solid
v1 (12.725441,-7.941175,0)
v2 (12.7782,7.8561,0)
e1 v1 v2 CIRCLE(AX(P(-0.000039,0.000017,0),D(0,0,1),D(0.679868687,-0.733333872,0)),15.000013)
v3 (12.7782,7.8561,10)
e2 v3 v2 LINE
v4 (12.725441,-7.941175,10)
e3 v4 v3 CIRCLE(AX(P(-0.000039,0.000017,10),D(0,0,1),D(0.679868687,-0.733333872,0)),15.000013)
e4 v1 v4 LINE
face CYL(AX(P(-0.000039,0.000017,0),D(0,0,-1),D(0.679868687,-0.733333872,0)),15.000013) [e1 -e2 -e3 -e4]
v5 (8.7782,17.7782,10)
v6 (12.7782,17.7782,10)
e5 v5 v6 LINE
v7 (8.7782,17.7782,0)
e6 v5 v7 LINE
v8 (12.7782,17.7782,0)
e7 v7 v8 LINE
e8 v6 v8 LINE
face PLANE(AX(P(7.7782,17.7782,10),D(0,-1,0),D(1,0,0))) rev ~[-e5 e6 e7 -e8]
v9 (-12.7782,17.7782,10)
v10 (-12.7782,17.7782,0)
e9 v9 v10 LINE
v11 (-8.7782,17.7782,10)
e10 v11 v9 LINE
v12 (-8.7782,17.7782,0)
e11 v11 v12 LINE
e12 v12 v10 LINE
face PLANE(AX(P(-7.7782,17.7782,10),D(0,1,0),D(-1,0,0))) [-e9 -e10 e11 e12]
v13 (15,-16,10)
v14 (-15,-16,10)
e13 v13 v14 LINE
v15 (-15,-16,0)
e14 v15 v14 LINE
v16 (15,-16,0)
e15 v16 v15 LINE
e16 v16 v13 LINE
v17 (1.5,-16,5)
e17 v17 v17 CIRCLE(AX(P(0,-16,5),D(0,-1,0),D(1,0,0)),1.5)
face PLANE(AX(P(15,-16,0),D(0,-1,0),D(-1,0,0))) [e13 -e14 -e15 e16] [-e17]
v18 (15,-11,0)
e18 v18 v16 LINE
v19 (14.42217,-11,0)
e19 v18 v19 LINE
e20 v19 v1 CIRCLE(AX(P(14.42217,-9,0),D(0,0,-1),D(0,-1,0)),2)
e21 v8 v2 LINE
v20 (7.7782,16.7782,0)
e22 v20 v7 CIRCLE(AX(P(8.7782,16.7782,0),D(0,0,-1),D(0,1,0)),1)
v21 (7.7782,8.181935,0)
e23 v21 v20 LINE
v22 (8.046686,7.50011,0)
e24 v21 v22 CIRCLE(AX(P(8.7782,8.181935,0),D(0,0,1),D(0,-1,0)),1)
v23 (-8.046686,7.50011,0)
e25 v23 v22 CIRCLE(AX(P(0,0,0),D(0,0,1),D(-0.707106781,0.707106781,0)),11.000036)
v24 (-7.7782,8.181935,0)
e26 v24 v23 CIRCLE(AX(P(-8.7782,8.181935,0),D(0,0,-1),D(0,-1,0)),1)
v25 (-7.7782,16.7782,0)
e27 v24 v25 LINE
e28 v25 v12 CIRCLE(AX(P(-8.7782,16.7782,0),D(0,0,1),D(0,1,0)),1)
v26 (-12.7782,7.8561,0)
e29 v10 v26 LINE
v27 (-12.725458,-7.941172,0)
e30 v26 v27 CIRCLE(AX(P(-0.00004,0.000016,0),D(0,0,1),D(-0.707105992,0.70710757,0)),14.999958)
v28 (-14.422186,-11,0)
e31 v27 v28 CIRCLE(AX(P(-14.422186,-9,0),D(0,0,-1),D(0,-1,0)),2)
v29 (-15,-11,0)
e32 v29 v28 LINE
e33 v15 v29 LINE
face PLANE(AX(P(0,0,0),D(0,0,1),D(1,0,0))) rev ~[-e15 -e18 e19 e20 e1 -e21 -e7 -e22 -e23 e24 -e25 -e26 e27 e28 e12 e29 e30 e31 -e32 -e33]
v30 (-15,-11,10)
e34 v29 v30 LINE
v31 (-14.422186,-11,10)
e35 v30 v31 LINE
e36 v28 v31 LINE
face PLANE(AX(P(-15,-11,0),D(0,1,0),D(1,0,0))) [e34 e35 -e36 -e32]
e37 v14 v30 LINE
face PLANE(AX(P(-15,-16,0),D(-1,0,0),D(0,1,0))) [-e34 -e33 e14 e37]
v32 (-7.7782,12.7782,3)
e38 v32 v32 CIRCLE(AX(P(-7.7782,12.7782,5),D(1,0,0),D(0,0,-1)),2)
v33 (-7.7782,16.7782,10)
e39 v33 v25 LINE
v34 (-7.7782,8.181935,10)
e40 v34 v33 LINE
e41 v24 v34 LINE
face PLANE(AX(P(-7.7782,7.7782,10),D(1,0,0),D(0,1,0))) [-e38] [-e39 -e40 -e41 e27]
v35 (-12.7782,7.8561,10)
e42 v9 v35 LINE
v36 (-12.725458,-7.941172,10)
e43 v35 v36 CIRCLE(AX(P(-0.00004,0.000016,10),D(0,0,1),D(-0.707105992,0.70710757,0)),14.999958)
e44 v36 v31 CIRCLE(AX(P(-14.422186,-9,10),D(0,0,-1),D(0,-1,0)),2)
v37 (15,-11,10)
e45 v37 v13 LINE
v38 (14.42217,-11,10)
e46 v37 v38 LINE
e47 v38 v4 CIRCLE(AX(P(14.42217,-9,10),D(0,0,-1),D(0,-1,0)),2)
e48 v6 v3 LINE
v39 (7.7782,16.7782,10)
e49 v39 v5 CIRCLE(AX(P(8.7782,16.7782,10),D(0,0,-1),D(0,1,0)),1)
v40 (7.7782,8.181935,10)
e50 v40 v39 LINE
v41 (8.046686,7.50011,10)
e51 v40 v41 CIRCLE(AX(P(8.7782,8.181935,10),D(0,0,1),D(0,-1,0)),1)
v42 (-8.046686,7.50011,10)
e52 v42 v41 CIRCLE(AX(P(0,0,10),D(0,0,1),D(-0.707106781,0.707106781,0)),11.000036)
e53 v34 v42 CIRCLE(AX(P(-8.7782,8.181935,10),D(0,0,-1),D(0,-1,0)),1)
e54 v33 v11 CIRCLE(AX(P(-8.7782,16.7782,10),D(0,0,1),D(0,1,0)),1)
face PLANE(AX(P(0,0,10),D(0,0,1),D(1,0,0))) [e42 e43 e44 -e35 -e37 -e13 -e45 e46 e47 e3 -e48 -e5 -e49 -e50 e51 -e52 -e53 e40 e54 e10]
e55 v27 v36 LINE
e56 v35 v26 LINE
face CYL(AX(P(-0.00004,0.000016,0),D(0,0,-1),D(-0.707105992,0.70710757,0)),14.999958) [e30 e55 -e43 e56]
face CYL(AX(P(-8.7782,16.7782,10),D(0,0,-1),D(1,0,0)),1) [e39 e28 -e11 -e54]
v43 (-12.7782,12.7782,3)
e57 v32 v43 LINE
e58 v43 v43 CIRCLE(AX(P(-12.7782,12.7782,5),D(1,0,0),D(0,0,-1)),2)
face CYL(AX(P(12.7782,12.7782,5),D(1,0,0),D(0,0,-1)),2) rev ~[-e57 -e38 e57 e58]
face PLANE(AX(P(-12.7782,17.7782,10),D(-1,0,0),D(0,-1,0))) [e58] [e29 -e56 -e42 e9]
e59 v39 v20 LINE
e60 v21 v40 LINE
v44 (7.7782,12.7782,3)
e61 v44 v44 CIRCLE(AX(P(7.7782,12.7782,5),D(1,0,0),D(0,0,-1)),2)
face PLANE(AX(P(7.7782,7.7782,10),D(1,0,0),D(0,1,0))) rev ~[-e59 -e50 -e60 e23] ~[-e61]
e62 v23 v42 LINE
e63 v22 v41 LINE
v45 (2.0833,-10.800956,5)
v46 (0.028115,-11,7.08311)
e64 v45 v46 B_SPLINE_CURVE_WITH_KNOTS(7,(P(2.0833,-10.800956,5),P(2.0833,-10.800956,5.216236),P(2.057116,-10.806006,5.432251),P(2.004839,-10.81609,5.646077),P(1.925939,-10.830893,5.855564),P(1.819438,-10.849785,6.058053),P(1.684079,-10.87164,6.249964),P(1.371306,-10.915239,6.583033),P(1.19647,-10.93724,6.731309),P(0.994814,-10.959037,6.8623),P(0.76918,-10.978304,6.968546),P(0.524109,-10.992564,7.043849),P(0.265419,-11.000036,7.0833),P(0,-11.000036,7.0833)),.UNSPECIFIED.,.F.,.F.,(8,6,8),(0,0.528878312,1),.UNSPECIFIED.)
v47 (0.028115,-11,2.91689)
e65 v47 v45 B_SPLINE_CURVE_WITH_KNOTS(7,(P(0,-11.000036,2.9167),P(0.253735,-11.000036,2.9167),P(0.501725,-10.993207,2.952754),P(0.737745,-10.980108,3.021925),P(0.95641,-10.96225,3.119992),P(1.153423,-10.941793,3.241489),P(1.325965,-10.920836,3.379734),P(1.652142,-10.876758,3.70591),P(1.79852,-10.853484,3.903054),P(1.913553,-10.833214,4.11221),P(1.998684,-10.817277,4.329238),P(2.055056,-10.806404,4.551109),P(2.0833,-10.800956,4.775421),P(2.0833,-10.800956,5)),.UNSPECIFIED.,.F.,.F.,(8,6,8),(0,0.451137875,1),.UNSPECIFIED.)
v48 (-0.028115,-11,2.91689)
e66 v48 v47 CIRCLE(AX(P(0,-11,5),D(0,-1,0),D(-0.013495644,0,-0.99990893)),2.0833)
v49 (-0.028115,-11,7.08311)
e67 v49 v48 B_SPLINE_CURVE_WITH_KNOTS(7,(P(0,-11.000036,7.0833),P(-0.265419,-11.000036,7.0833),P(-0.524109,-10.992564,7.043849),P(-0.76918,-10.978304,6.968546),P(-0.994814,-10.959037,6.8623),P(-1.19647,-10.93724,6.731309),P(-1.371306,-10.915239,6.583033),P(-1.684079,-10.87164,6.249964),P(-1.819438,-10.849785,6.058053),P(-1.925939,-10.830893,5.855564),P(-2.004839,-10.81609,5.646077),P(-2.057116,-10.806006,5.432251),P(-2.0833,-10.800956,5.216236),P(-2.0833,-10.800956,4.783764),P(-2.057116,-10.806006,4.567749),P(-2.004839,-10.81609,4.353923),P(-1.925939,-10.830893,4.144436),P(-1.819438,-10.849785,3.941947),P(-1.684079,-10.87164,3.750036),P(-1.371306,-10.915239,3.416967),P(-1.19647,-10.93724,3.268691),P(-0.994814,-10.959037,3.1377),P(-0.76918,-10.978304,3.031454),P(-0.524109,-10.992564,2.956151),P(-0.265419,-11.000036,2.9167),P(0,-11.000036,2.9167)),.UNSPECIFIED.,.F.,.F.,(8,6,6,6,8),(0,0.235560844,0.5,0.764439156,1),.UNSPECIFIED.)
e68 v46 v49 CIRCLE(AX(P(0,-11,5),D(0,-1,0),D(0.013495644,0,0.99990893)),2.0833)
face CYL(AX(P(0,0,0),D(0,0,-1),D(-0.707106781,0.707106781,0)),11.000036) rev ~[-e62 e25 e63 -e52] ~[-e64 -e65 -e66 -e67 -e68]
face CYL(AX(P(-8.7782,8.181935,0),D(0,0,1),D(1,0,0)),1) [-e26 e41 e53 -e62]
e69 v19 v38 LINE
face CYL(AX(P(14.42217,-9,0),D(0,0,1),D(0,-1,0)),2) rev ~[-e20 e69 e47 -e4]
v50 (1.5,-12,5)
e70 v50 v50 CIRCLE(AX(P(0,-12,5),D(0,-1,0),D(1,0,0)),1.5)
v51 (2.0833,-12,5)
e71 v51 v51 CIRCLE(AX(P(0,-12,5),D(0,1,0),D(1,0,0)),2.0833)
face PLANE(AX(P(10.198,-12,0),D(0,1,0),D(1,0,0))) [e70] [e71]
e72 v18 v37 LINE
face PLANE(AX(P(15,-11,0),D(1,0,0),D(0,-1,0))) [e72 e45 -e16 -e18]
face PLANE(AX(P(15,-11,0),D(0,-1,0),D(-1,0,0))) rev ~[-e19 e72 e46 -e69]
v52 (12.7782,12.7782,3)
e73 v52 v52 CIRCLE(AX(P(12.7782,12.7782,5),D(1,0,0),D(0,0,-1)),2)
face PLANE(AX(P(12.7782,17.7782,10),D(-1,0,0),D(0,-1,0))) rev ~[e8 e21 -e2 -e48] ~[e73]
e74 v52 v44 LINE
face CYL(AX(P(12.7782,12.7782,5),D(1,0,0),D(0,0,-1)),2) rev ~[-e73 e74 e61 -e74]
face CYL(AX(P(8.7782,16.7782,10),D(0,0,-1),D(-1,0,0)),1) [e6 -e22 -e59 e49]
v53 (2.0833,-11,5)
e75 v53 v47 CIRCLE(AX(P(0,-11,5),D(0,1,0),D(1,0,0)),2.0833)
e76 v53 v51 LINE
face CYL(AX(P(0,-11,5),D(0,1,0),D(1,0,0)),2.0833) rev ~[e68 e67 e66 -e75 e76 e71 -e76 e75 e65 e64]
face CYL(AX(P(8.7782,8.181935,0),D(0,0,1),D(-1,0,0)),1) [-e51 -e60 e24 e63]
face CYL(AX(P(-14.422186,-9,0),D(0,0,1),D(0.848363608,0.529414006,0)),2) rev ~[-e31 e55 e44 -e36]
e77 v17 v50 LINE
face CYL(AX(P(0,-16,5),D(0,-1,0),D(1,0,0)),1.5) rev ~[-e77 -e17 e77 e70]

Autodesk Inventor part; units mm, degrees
ref_plane "YZ Plane" through (0, 0, 0) normal (1, 0, 0) x (0, 1, 0)
ref_plane "XZ Plane" through (0, 0, 0) normal (0, 1, 0) x (-1, 0, 0)
ref_plane "XY Plane" through (0, 0, 0) normal (0, 0, 1) x (1, 0, 0)
sketch "Sketch1" plane through (0, 0, 0) normal (0, 0, 1) x (1, 0, 0)
  arc A0 (-7.7782, 7.7782) -> (7.7782, 7.7782) centre (0, 0) ccw
  line L0 (7.7782, 7.7782) -> (11.0228, 11.0228)
  line L1 (0, 0) -> (15.5887, 0) construction
  line L2 (0, 0) -> (20, 0) construction
  line L3 (-7.7782, 7.7782) -> (-10.6066, 10.6066)
  line L4 (15, -11) -> (15, -16)
  line L5 (15, -16) -> (-15, -16)
  line L6 (-15, -16) -> (-15, -11)
  line L7 (-15, -11) -> (-10.198, -11)
  arc A1 (-10.6066, 10.6066) -> (-10.198, -11) centre (0, 0) ccw
  arc A2 (10.198, -11) -> (10.6066, 10.6066) centre (0, 0) ccw
  line L8 (15, -11) -> (10.198, -11)
  dimension "d6" = 5
  dimension "d7" = 30
extrude "Extrusion1" add sketch "Sketch1" along normal blind 10
sketch "Sketch2" plane through (-15, -16, 0) normal (0, -1, 0) x (1, 0, 0)
  line L0 (0, 10) -> (30, 10) projected
  line L1 (30, 10) -> (25.198, 10) projected
  line L2 (0, 0) -> (30, 0) projected
  circle A0 centre (15, 5) radius 1.5
  point P0 (15, 0)
  dimension "d10" = 3
extrude "Extrusion2" cut sketch "Sketch2" against normal blind 24.75
sketch "Sketch3" plane through (10.198, -11, 0) normal (0, 1, 0) x (1, 0, 0)
  line L0 (4.802, 0) -> (0, 0) projected
  line L1 (-20.3961, -10) -> (-25.198, -10) projected
  line L2 (-20.3961, 0) -> (-25.198, 0) projected
  line L3 (4.802, -10) -> (0, -10) projected
  circle A0 centre (-10.198, -5) radius 2.0833
  point P0 (-10.198, 0)
sketch "Sketch4" plane through (0, 0, 0) normal (0, 0, -1) x (-1, 0, 0)
  point P0 (0, 0)
extrude "Extrusion3" cut sketch "Sketch3" against normal blind 1
sketch "Sketch5" plane through (10.198, -11, 0) normal (0, -1, 0) x (1, 0, 0)
  arc A0 (-10.198, 3.5) -> (-10.198, 6.5) centre (-10.198, 5) ccw projected
  arc A1 (-10.198, 2.9167) -> (-10.198, 7.0833) centre (-10.198, 5) ccw projected
  circle A2 centre (-10.198, 5) radius 2.0833
  point P0 (-10.198, 0)
  point P1 (-10.198, 2.9167)
extrude "Extrusion4" cut sketch "Sketch5" against normal blind 1.5
fillet "Fillet1" radius 2 1 edges at (-10.198, -11, 5)
fillet "Fillet2" radius 2 1 edges at (10.198, -11, 5)
sketch "Sketch6" plane through (0, 0, 10) normal (0, 0, 1) x (1, 0, 0)
  line L0 (-7.7782, 7.7782) -> (-10.6066, 10.6066) projected
  line L1 (-7.7782, 7.7782) -> (-7.7782, 17.7782)
  line L2 (-7.7782, 17.7782) -> (-12.7782, 17.7782)
  line L3 (-12.7782, 17.7782) -> (-12.7782, 7.8561)
  arc A0 (-10.6066, 10.6066) -> (-12.7255, -7.9412) centre (0, 0) ccw projected
  dimension "d21" = 10
  dimension "d22" = 5
extrude "Extrusion5" add sketch "Sketch6" against normal blind 10
sketch "Sketch7" plane through (0, 0, 10) normal (0, 0, 1) x (1, 0, 0)
  line L0 (7.7782, 7.7782) -> (7.7782, 17.7782)
  line L1 (7.7782, 17.7782) -> (12.7782, 17.7782)
  line L2 (12.7782, 17.7782) -> (12.7782, 7.8561)
  arc A0 (12.7255, -7.9412) -> (10.6066, 10.6066) centre (0, 0) ccw projected
  arc A1 (-7.7782, 7.7782) -> (7.7782, 7.7782) centre (0, 0) ccw projected
  line L3 (7.7782, 7.7782) -> (12.7782, 7.8561)
  dimension "d25" = 5
extrude "Extrusion6" add sketch "Sketch7" against normal blind 10
sketch "Sketch8" plane through (12.7782, 7.8561, 10) normal (1, 0, 0) x (0, 0, -1)
  line L0 (0, 9.9221) -> (0, 0) construction
  line L1 (10, -0.0779) -> (0, -0.0779) construction
  line L2 (0, 9.9221) -> (10, -0.0779) construction
  line L3 (0, 9.9221) -> (10, 9.9221) construction
  line L4 (10, 9.9221) -> (0, -0.0779) construction
  circle A0 centre (5, 4.9221) radius 2
  point P0 (10, -7.8561)
  dimension "d28" = 4
extrude "Extrusion7" cut sketch "Sketch8" against normal blind 36
fillet "Fillet5" radius 1 1 edges at (-7.7782, 17.7782, 5)
fillet "Fillet6" radius 1 1 edges at (-7.7782, 7.7782, 5)
fillet "Fillet7" radius 1 1 edges at (7.7782, 17.7782, 5)
fillet "Fillet8" radius 1 1 edges at (7.7782, 7.7782, 5)
properties part number "buisClip"
